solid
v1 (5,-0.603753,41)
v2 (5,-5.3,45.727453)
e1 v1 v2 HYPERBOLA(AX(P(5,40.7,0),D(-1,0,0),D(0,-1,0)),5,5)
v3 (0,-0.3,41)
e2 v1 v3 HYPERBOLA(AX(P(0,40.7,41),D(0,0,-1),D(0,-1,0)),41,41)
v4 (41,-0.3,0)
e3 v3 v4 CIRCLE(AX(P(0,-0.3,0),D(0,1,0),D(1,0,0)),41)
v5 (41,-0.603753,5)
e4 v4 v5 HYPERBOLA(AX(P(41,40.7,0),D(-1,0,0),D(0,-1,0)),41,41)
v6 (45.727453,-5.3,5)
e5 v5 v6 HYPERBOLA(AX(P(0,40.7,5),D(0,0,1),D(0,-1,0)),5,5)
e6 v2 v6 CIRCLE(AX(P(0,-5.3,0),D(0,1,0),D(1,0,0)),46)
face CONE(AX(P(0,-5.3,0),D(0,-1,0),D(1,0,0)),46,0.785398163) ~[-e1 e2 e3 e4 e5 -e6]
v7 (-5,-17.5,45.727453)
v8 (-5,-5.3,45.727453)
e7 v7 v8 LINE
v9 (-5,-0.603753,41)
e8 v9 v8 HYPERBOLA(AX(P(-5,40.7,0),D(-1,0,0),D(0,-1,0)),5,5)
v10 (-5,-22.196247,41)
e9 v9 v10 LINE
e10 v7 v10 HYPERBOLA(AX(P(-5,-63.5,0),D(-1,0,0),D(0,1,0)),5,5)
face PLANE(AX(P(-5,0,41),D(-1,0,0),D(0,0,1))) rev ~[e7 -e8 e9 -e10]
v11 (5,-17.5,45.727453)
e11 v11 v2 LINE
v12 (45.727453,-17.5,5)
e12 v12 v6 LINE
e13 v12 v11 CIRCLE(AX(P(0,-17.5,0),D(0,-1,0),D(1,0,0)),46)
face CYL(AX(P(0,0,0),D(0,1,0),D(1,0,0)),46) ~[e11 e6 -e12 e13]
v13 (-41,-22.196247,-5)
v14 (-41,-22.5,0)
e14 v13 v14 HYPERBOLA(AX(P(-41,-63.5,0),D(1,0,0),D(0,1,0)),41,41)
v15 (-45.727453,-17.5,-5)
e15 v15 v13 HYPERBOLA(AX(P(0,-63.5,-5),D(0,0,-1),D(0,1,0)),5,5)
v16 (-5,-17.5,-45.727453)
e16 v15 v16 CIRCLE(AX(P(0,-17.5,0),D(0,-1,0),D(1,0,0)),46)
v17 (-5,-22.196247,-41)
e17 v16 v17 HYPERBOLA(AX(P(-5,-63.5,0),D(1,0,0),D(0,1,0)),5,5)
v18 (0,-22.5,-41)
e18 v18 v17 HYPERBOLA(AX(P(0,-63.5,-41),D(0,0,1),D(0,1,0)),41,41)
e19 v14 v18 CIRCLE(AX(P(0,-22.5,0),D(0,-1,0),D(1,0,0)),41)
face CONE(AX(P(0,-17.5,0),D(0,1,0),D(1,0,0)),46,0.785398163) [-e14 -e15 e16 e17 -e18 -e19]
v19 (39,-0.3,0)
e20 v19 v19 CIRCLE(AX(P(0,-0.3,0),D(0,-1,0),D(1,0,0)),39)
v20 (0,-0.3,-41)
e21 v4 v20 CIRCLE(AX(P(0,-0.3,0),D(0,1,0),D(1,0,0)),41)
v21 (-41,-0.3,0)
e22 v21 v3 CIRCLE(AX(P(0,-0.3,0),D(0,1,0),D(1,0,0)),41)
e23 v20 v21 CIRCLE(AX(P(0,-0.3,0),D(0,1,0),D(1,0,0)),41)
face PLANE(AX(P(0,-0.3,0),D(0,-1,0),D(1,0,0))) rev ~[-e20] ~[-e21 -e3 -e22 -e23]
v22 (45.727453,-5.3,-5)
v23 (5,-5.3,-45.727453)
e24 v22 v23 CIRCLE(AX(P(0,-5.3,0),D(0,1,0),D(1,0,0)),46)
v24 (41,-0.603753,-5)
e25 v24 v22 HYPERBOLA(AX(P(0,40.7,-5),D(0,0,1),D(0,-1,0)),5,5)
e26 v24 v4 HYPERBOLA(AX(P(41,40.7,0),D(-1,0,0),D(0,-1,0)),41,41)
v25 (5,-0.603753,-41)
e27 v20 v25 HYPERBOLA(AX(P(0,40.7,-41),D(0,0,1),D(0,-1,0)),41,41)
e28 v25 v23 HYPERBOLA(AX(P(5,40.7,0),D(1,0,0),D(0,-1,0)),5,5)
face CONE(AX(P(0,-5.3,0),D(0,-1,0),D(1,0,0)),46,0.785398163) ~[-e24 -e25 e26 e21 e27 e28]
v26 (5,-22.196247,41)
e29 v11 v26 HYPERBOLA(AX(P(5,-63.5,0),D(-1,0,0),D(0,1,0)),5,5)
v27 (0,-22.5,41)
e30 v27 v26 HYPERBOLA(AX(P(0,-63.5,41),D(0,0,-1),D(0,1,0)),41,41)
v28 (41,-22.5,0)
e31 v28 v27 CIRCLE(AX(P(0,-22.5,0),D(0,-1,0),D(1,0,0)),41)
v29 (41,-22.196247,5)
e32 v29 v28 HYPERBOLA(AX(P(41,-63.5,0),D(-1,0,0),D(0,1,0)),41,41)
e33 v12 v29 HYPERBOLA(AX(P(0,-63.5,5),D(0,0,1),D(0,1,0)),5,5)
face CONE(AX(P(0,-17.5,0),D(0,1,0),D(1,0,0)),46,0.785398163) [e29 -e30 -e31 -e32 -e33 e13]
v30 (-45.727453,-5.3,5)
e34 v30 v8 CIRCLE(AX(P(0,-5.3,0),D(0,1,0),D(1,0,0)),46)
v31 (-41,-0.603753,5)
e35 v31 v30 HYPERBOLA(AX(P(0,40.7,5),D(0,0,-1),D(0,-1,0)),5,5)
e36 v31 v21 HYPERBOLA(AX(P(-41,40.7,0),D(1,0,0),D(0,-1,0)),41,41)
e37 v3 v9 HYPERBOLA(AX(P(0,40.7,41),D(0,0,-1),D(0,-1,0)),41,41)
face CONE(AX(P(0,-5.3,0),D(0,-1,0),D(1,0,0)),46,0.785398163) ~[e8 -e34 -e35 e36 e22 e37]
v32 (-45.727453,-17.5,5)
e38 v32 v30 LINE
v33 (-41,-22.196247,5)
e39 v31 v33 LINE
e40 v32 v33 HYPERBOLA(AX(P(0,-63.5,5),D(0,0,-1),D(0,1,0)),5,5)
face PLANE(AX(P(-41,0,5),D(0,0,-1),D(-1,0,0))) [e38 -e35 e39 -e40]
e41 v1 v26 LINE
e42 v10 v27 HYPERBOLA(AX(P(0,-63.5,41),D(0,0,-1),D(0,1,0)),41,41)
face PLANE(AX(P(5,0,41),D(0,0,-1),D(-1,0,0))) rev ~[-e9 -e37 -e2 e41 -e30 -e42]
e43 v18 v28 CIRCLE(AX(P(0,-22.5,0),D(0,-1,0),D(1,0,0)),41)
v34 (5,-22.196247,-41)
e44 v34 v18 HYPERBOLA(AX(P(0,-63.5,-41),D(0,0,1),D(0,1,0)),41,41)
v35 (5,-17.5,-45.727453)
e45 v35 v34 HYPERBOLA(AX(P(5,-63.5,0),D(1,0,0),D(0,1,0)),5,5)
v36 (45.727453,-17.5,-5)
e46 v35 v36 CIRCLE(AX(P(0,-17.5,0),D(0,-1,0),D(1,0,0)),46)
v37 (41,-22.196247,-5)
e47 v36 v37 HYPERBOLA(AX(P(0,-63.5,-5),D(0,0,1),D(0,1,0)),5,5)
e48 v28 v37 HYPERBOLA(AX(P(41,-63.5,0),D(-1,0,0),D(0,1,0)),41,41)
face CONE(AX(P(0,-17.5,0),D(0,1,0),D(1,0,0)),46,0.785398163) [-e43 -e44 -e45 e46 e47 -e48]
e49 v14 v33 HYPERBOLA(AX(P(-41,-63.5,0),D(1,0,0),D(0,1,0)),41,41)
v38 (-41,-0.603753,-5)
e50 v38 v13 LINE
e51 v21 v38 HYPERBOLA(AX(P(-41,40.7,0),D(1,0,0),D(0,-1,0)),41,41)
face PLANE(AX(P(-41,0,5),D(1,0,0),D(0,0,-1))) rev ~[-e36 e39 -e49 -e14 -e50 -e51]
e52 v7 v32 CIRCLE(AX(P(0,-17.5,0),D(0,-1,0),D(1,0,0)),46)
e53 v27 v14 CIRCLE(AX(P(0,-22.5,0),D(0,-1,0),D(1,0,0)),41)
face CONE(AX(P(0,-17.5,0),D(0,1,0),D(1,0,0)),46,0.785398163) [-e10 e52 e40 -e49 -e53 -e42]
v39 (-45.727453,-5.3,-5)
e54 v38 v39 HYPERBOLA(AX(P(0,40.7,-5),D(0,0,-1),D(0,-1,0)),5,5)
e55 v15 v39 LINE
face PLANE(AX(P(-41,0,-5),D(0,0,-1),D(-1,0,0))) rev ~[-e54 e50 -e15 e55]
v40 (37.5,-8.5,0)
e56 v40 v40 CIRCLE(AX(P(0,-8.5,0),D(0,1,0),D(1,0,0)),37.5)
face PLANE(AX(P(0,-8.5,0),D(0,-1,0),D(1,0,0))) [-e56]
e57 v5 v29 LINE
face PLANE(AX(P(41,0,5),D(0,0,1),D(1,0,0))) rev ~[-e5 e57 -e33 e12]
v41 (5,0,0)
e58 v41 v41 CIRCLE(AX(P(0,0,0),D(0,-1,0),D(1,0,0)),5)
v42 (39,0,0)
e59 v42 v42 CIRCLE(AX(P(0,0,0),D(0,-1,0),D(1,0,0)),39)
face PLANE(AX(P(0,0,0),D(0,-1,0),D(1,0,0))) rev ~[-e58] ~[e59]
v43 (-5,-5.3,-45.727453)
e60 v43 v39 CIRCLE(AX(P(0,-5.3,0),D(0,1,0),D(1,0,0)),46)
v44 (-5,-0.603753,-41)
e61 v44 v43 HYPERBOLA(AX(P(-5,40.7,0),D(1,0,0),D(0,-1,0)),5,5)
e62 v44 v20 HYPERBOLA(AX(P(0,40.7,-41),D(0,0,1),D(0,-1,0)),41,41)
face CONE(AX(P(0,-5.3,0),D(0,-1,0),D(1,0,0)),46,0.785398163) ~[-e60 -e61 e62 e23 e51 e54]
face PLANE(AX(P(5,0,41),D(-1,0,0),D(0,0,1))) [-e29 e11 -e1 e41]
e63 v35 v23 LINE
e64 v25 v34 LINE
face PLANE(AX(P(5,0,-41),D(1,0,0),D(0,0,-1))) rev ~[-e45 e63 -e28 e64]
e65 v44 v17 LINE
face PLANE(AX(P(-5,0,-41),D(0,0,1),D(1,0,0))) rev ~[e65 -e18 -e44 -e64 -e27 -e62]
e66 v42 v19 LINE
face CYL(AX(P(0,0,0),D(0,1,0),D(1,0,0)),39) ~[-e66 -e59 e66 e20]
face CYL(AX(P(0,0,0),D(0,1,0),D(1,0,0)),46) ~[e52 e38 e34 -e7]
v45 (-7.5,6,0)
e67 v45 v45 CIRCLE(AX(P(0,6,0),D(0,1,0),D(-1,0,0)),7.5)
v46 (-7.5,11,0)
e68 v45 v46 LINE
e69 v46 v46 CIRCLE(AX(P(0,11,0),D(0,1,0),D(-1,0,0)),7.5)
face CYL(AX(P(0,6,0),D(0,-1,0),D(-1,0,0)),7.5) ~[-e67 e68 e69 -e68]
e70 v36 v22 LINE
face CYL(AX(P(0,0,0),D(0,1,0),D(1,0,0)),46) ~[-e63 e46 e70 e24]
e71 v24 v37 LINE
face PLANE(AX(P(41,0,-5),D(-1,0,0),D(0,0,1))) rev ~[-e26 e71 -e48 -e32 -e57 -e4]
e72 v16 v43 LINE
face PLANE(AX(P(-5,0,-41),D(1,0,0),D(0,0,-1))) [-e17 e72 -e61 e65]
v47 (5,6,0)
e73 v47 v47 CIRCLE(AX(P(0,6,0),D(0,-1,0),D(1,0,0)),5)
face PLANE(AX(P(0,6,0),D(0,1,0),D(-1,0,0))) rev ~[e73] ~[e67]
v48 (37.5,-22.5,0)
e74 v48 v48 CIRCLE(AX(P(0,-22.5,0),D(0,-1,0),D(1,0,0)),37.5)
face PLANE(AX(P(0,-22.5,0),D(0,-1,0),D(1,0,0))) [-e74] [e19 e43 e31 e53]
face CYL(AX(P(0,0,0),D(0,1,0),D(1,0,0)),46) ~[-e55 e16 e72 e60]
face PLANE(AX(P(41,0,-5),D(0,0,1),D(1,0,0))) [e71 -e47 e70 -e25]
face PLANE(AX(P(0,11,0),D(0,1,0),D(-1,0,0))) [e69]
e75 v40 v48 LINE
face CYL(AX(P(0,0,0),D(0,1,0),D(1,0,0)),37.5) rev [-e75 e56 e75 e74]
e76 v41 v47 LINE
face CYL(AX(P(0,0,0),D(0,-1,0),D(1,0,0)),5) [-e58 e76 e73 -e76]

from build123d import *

# Parameters (mm, degrees)
F0_R             = 46
F1_DEPTH         = 22.5
F2_T             = -8.5
F3_R             = 55.4976575172
F3_R_2           = 39
F4_DEPTH         = 0.3
F5_R             = 5
F6_DEPTH         = 6
F7_R             = 7.5
F7_R_2           = 5
F8_DEPTH         = 5
F9_SIZE2         = 5
F9_SIZE          = 5
F10_W            = 11.5703346615
F10_H            = 10
F11_DEPTH        = 22.501
F11_COPIES_COUNT = 4


# Not quite as in the source:
# - a pattern or mirror of a feature is missing from the dataset's text; its kind, count and spacing are read off the source's solid


with BuildPart() as f1:
    # F0 (on Front) → F1 (new body)
    with BuildSketch(Plane.XZ):
        Circle(F0_R)
    extrude(amount=F1_DEPTH)

    # F2
    f2_openings = [f1.faces().sort_by_distance(p)[0] for p in [
        (0, -22.5, 0),
    ]]
    offset(amount=F2_T, openings=f2_openings)

    # F3 (on Front) → F4 (cut)
    with BuildSketch(Plane.XZ):
        Circle(F3_R)
        Circle(F3_R_2, mode=Mode.SUBTRACT)
    extrude(amount=F4_DEPTH, mode=Mode.SUBTRACT)

    # F5 (on Front) → F6 (join)
    with BuildSketch(Plane.XZ):
        Circle(F5_R)
    extrude(amount=-F6_DEPTH)

    # F7 (on face) → F8 (join)
    with BuildSketch(Plane(origin=(0, 6, 0), x_dir=(-1, 0, 0), z_dir=(0, 1, 0))):
        Circle(F7_R)
        Circle(F7_R_2, mode=Mode.SUBTRACT)
        Circle(F7_R_2)
    extrude(amount=F8_DEPTH)

    # F9
    f9_edges = [f1.edges().sort_by_distance(p)[0] for p in [
        (-46, -0.3, 0),
        (-46, -22.5, 0),
    ]]
    chamfer(f9_edges, length=F9_SIZE, length2=F9_SIZE2)

    # F10 (on Front) → F11 (cut, through all)
    with BuildSketch(Plane.XZ):
        with Locations((46.7851673308, 0)):
            Rectangle(F10_W, F10_H)
    f11 = extrude(amount=F11_DEPTH, mode=Mode.SUBTRACT)

    # F11_copies: F11 ×4 about axis
    f11_copies_axis = Axis((0, 0, 0), (0, 1, 0))
    for i in range(1, F11_COPIES_COUNT):
        add(f11.rotate(f11_copies_axis, i * 360 / F11_COPIES_COUNT), mode=Mode.SUBTRACT)


solid = f1.part
